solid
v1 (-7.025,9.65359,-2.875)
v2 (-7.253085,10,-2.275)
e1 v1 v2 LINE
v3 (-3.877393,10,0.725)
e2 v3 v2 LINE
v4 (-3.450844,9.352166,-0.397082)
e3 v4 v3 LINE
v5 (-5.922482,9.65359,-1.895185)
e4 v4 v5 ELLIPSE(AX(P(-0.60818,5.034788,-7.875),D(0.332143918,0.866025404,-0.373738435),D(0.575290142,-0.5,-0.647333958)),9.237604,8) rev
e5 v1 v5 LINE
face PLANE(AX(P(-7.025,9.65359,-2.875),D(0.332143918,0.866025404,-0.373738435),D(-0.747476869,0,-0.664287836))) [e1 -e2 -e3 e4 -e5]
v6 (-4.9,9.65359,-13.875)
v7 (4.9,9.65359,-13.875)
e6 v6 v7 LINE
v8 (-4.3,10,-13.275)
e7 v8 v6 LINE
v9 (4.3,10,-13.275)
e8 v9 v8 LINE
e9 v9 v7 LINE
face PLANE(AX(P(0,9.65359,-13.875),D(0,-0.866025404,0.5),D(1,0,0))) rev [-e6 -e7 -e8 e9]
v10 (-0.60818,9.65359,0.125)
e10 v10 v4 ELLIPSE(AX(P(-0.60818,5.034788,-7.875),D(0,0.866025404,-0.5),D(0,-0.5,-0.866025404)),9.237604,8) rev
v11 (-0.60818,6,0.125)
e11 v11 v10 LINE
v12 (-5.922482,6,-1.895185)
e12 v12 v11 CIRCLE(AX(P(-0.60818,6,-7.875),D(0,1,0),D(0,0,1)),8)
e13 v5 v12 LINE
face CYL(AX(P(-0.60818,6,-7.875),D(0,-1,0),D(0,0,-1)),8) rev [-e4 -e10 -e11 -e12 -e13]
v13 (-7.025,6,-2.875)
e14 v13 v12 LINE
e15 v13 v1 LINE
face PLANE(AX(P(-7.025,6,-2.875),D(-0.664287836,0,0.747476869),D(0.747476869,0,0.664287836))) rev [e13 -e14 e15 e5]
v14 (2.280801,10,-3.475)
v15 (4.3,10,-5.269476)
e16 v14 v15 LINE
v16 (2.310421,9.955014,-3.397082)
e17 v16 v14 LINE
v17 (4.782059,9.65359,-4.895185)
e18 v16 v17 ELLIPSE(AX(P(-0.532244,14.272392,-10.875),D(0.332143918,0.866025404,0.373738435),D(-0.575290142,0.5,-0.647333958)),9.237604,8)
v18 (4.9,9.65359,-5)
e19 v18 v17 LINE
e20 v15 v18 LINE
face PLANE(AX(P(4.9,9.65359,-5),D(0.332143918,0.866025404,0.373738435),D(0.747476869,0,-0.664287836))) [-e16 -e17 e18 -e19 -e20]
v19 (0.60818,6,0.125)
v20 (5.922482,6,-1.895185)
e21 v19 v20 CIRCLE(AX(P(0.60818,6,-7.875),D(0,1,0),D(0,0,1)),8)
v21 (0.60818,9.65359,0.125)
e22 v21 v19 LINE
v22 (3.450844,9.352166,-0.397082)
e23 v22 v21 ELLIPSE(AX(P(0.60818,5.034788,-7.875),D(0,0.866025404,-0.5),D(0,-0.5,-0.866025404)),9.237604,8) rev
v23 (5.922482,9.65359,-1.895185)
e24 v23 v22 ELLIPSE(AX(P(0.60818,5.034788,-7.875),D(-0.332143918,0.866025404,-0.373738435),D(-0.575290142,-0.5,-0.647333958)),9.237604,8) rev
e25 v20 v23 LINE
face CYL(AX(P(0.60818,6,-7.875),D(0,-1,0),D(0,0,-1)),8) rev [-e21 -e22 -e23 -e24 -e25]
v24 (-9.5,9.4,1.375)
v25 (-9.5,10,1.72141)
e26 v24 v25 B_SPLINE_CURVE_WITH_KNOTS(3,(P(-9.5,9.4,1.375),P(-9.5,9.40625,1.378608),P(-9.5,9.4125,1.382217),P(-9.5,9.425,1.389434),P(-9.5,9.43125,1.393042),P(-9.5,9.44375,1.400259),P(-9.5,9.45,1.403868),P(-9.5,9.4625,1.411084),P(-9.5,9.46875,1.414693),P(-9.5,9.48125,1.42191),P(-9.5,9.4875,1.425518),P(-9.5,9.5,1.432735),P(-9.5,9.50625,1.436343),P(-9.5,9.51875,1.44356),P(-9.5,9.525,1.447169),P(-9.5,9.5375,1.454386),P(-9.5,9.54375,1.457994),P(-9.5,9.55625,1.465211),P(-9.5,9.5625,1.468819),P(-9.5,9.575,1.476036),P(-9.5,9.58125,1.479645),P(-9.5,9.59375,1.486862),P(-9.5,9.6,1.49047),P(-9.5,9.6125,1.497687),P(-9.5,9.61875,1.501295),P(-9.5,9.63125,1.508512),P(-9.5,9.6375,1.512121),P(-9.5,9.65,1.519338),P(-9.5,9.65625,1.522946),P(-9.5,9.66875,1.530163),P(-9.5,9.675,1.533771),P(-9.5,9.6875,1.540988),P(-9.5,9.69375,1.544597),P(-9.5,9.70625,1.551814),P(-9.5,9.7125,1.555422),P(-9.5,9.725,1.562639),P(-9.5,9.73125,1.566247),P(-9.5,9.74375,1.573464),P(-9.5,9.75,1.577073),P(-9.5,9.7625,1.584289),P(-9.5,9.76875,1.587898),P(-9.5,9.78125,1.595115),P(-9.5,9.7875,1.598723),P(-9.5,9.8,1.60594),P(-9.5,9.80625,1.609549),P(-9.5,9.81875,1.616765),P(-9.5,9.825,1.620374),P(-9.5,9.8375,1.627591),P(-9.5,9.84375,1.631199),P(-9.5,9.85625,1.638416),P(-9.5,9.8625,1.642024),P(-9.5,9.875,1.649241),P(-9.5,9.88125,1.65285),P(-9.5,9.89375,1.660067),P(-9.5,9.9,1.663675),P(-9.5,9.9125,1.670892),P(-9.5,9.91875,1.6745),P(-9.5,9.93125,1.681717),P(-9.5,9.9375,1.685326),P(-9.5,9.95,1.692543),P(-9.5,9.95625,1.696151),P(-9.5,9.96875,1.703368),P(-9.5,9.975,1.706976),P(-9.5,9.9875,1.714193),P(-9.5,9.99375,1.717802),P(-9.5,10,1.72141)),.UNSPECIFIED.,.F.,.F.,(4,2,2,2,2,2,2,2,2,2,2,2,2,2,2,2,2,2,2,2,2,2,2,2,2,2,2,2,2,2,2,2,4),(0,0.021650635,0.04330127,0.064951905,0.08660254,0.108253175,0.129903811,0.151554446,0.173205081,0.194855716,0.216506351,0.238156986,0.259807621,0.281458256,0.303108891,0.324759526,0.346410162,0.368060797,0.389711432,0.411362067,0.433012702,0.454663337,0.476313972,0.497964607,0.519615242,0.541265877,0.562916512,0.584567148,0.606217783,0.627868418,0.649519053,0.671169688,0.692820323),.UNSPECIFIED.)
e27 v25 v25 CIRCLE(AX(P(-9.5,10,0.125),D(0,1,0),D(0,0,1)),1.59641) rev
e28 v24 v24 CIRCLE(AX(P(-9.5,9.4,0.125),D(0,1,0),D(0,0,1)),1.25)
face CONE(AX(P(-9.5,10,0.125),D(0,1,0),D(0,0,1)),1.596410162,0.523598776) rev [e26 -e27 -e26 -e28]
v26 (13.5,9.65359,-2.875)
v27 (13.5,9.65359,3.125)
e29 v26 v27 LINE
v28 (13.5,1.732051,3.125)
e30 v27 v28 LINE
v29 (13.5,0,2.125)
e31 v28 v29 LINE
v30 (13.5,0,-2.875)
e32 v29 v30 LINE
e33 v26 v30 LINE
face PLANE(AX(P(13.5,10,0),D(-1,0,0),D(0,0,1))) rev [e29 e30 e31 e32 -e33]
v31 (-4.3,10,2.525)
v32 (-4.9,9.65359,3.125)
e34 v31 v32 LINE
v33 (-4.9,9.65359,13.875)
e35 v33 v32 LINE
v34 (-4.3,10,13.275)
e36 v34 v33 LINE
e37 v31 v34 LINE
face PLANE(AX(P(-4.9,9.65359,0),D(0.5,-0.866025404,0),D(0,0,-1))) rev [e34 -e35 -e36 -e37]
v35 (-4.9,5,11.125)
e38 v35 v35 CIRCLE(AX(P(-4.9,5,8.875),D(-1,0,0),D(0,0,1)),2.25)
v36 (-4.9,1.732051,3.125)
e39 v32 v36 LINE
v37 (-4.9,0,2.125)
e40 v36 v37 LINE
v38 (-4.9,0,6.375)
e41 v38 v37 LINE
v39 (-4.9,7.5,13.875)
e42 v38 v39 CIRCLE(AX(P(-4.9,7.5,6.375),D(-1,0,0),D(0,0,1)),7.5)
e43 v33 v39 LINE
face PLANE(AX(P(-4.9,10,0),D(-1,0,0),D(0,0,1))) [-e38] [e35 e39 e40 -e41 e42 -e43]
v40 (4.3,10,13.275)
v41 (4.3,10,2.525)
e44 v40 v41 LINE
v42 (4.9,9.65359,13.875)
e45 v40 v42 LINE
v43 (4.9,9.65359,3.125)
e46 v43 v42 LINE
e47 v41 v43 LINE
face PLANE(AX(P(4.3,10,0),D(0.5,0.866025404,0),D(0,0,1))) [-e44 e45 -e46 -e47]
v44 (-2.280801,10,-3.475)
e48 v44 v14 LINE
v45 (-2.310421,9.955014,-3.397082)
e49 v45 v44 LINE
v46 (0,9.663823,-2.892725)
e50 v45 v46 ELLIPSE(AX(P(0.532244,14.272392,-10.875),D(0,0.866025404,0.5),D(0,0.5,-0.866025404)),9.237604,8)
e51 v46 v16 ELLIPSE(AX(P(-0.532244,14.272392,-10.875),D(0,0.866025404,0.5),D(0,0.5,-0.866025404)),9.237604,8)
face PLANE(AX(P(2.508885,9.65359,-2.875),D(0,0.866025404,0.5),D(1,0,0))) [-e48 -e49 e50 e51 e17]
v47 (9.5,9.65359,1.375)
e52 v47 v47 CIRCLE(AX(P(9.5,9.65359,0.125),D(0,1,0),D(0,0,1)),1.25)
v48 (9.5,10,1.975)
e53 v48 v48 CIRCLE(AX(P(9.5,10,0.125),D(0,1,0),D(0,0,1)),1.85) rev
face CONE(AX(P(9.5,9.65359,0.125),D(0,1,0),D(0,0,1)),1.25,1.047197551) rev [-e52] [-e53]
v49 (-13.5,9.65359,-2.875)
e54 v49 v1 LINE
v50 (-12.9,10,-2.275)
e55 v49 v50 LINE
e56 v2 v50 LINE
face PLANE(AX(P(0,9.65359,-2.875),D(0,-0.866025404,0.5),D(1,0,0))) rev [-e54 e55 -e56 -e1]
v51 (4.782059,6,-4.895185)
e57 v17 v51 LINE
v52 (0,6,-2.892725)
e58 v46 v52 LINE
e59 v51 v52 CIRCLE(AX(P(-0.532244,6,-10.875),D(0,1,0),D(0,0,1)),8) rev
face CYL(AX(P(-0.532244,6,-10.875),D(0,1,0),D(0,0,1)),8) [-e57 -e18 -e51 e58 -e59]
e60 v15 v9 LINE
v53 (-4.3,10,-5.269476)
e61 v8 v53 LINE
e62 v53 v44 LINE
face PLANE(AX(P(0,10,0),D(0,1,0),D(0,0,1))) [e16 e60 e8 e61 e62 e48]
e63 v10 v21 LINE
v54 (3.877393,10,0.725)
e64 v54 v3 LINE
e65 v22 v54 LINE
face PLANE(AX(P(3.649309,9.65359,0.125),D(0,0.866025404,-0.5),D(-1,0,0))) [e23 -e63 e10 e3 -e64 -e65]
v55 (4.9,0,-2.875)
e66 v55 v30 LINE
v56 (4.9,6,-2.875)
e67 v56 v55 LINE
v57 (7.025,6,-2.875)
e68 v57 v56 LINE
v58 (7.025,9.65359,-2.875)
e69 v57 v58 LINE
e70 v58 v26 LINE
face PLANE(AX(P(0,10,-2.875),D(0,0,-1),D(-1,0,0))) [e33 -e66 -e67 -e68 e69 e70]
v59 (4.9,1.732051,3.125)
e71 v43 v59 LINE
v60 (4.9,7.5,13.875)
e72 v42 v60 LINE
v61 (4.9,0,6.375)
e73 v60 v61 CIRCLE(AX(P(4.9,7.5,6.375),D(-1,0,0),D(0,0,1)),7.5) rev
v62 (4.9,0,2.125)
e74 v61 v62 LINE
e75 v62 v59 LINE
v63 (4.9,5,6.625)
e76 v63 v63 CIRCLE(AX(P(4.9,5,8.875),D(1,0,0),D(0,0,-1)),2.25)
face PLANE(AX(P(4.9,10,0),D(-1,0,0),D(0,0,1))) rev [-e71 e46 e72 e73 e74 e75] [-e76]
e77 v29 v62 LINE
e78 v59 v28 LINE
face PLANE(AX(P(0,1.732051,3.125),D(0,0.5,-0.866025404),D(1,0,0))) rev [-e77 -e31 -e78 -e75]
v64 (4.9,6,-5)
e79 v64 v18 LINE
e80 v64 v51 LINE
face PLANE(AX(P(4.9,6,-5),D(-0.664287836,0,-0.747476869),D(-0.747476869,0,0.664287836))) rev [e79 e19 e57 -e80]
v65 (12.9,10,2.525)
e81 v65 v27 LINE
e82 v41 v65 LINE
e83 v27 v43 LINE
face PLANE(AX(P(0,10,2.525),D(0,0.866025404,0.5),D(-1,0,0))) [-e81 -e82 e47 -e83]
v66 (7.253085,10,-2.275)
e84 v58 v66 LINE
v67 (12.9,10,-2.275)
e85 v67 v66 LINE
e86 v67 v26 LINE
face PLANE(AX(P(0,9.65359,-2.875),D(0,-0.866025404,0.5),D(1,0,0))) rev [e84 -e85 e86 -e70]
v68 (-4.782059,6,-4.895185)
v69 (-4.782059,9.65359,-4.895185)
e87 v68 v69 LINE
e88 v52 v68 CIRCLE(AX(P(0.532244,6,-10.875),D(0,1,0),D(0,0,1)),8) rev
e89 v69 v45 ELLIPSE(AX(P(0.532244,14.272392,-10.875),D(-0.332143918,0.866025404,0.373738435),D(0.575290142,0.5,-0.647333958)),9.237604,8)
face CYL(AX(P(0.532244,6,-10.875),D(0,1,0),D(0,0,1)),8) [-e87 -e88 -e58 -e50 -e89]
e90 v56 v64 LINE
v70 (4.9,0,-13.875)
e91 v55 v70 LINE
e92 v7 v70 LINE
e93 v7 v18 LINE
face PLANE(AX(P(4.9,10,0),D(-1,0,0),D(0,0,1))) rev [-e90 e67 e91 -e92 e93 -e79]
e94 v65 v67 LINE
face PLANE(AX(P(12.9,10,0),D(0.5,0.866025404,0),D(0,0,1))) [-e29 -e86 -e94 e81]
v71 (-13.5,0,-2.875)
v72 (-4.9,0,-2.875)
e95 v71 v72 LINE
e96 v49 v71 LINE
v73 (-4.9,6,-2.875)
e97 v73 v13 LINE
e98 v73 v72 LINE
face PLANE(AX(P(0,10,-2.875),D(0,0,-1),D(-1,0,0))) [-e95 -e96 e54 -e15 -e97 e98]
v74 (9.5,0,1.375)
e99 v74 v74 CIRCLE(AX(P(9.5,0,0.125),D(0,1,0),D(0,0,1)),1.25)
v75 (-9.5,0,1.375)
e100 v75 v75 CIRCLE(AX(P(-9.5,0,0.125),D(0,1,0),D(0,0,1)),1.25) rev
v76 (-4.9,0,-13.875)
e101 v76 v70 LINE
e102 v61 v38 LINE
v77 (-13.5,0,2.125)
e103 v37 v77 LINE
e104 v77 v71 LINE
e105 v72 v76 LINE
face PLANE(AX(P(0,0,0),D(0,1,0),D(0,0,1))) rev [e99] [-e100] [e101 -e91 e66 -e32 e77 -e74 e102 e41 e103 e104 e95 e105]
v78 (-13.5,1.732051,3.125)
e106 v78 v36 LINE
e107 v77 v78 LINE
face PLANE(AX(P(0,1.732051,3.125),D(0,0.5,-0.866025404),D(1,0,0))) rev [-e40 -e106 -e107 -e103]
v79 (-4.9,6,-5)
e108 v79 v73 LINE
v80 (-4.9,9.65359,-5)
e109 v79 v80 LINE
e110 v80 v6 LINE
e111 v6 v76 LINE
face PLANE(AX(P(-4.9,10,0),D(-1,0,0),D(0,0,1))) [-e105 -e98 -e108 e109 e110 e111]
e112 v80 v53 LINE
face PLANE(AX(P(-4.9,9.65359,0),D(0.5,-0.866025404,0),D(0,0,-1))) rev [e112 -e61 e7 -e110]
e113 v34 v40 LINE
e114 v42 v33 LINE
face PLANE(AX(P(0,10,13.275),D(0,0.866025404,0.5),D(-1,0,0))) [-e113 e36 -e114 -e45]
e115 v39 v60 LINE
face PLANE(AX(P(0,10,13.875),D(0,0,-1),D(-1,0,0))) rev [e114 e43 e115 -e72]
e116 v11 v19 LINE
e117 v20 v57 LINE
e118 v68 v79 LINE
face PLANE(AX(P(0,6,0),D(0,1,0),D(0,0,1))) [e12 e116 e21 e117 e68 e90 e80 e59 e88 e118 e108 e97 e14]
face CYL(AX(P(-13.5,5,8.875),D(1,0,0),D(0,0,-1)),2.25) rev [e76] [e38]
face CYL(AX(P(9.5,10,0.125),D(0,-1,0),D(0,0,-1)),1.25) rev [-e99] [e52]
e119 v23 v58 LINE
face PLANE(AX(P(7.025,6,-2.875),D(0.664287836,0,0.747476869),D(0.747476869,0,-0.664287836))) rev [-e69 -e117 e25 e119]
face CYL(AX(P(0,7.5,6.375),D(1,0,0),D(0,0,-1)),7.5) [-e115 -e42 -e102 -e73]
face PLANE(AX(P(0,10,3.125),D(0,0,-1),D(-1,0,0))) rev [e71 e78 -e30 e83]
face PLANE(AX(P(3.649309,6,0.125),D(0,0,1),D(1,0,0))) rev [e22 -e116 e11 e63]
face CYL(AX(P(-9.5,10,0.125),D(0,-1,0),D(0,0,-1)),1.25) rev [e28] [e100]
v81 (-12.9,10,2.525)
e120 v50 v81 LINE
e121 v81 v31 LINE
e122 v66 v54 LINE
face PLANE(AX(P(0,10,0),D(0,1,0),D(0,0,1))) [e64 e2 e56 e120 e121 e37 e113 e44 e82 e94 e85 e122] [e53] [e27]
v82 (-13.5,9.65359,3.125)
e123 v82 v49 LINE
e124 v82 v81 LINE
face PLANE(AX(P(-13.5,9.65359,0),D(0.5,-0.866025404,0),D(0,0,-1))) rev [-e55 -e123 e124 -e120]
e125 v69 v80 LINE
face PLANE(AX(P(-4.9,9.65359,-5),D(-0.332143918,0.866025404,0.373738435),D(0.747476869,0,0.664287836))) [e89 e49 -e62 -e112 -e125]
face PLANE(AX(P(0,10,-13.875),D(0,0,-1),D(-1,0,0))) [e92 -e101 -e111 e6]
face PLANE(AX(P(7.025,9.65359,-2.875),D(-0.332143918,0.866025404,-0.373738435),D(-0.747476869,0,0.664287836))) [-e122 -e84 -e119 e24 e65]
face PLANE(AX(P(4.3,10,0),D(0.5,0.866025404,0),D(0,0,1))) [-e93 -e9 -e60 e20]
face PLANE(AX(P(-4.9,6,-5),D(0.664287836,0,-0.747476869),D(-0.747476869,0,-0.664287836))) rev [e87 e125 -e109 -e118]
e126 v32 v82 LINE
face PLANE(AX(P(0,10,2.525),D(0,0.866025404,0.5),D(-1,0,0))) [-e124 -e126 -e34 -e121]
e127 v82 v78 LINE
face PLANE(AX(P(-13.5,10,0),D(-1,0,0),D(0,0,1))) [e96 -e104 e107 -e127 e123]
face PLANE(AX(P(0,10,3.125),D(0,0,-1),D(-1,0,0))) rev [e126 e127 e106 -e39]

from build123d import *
from OCP.BRepFilletAPI import BRepFilletAPI_MakeChamfer

# Parameters (mm, degrees)
SKETCH_1_W          = 9.8
SKETCH_1_H          = 11
SKETCH_1_W_2        = 8.6
SKETCH_1_H_2        = 6
SKETCH_1_R          = 1.25
SKETCH_1_H_3        = 10.75
EXTRUDE_1_DEPTH     = 10
SKETCH_3_R          = 2.25
CUT_EXTRUDE_2_DEPTH = 26.121218621
CUT_EXTRUDE_3_DEPTH = 4
FILLET_2_R          = 7.5
CHAMFER_1_SIZE      = 0.6
CHAMFER_1_SIZE2     = 0.346410162
FILLET_3_R          = 8
CHAMFER_3_SIZE      = 1
CHAMFER_3_SIZE2     = 1.732050808


with BuildPart() as part:
    # ｽｹｯﾁ1 → ﾎﾞｽ - 押し出し1 (new body)
    # profile 1 of 5: a face of its own
    with BuildSketch(Plane(origin=(0, 0, 0), x_dir=(1, 0, 0), z_dir=(0, 1, 0))):
        with Locations((0, 8.375)):
            Rectangle(SKETCH_1_W, SKETCH_1_H)
    # profile 2 of 5: a face of its own
    with BuildSketch(Plane(origin=(0, 0, 0), x_dir=(1, 0, 0), z_dir=(0, 1, 0))):
        with Locations((9.2, -0.125)):
            Rectangle(SKETCH_1_W_2, SKETCH_1_H_2)
        with Locations(Location((9.5, -0.125, 0), (0, 0, 270))):
            Circle(SKETCH_1_R, mode=Mode.SUBTRACT)
    # profile 3 of 5: a face of its own
    with BuildSketch(Plane(origin=(0, 0, 0), x_dir=(1, 0, 0), z_dir=(0, 1, 0))):
        with Locations((0, -0.125)):
            Rectangle(SKETCH_1_W, SKETCH_1_H_2)
    # profile 4 of 5: a face of its own
    with BuildSketch(Plane(origin=(0, 0, 0), x_dir=(1, 0, 0), z_dir=(0, 1, 0))):
        with Locations((-9.2, -0.125)):
            Rectangle(SKETCH_1_W_2, SKETCH_1_H_2)
        with Locations(Location((-9.5, -0.125, 0), (0, 0, 270))):
            Circle(SKETCH_1_R, mode=Mode.SUBTRACT)
    # profile 5 of 5: a face of its own
    with BuildSketch(Plane(origin=(0, 0, 0), x_dir=(1, 0, 0), z_dir=(0, 1, 0))):
        with Locations((0, -8.5)):
            Rectangle(SKETCH_1_W, SKETCH_1_H_3)
    extrude(amount=EXTRUDE_1_DEPTH)

    # ｽｹｯﾁ3 → ｶｯﾄ - 押し出し2 (cut, through all)
    with BuildSketch(Plane(origin=(4.9, 0, 0), x_dir=(0, 0, -1), z_dir=(1, 0, 0))):
        with Locations((-8.875, 5)):
            Circle(SKETCH_3_R)
    extrude(amount=-CUT_EXTRUDE_2_DEPTH, mode=Mode.SUBTRACT)

    # ｽｹｯﾁ5 → ｶｯﾄ - 押し出し3 (cut)
    with BuildSketch(Plane(origin=(0, 10, 0), x_dir=(1, 0, 0), z_dir=(0, 1, 0))):
        Polygon((4.9, 5), (2.508885395, 2.875), (-2.508885395, 2.875), (-4.9, 5), (-4.9, 2.875), (-7.025, 2.875), (-3.649308793, -0.125), (3.649308793, -0.125), (7.025, 2.875), (4.9, 2.875), align=None)
    extrude(amount=-CUT_EXTRUDE_3_DEPTH, mode=Mode.SUBTRACT)

    # ﾌｨﾚｯﾄ2
    fillet_2_edges = [part.edges().sort_by_distance(p)[0] for p in [
        (0, 0, 13.875),
    ]]
    fillet(fillet_2_edges, radius=FILLET_2_R)

    # 面取り1: one chamfer whose edges measure the first distance from different faces: ONE call of the kernel's chamfer builder (chamfer() names one face for all edges)
    chamfer_1_edges_1 = [part.edges().sort_by_distance(p)[0] for p in [
        (-10.2625, 10, -2.875),
        (-13.5, 10, 0.125),
        (-9.2, 10, 3.125),
        (-4.9, 10, 8.5),
        (0, 10, 13.875),
        (4.9, 10, 8.5),
        (9.2, 10, 3.125),
        (13.5, 10, 0.125),
        (10.2625, 10, -2.875),
        (-5.337154396, 10, -1.375),
        (0, 10, 0.125),
        (5.337154396, 10, -1.375),
        (9.5, 10, -1.125),
    ]]
    chamfer_1_side_1 = [part.faces().sort_by_distance(p)[0] for p in [
        (0, 10, 4.272957296),
    ]]
    chamfer_1_edges_2 = [part.edges().sort_by_distance(p)[0] for p in [
        (-4.9, 10, -9.4375),
        (4.9, 10, -9.4375),
        (0, 10, -13.875),
        (3.704442697, 10, -3.9375),
        (0, 10, -2.875),
        (-3.704442697, 10, -3.9375),
    ]]
    chamfer_1_side_2 = [part.faces().sort_by_distance(p)[0] for p in [
        (0, 10, -8.612025812),
    ]]
    chamfer_1_edges_3 = [part.edges().sort_by_distance(p)[0] for p in [
        (-9.5, 10, -1.125),
    ]]
    chamfer_1_side_3 = [part.faces().sort_by_distance(p)[0] for p in [
        (-9.5, 5, -1.125),
    ]]
    chamfer_1 = BRepFilletAPI_MakeChamfer(part.part.solid().wrapped)
    for e in chamfer_1_edges_1:
        chamfer_1.Add(CHAMFER_1_SIZE, CHAMFER_1_SIZE2, e.wrapped, chamfer_1_side_1[0].wrapped)  # the first distance lies on this face
    for e in chamfer_1_edges_2:
        chamfer_1.Add(CHAMFER_1_SIZE, CHAMFER_1_SIZE2, e.wrapped, chamfer_1_side_2[0].wrapped)  # the first distance lies on this face
    for e in chamfer_1_edges_3:
        chamfer_1.Add(CHAMFER_1_SIZE, CHAMFER_1_SIZE2, e.wrapped, chamfer_1_side_3[0].wrapped)  # the first distance lies on this face
    add(Compound.cast(chamfer_1.Shape()), mode=Mode.REPLACE)

    # ﾌｨﾚｯﾄ3
    # the kernel refuses this fillet: 8 mm, written as the material it adds along each edge
    with BuildSketch(Plane(origin=(-3.649308793, 17.256412491, 0.125), x_dir=(-0.7474768694815634, 0, -0.6642878364007891), z_dir=(0, -1, 0))) as fillet_3_piece_1_section:
        with BuildLine():
            CenterArc((FILLET_3_R * 0.380141132625, FILLET_3_R), FILLET_3_R, 228.372286683, 41.627713317)
            Line((-FILLET_3_R * 0.284146703776, FILLET_3_R * 0.252523130518), (0, 0))
            Line((0, 0), (FILLET_3_R * 0.380141132625, 0))
        make_face()
    fillet_3_piece_1 = extrude(amount=11.256412491, mode=Mode.PRIVATE)
    fillet_3_piece_1 = split(fillet_3_piece_1, bisect_by=Plane(origin=(-2.381035156, 9.533713371, -0.082632133), z_dir=(0, -0.8660254037844377, 0.5000000000000018)), keep=Keep.TOP, mode=Mode.PRIVATE)
    add(fillet_3_piece_1)
    with BuildSketch(Plane(origin=(-3.649308793, 17.256412491, 0.125), x_dir=(-0.7474768694815634, 0, -0.6642878364007891), z_dir=(0, -1, 0))) as fillet_3_piece_2_section:
        with BuildLine():
            CenterArc((FILLET_3_R * 0.380141132625, FILLET_3_R), FILLET_3_R, 228.372286683, 41.627713317)
            Line((-FILLET_3_R * 0.284146703776, FILLET_3_R * 0.252523130518), (0, 0))
            Line((0, 0), (FILLET_3_R * 0.380141132625, 0))
        make_face()
    fillet_3_piece_2 = extrude(amount=11.256412491, mode=Mode.PRIVATE)
    fillet_3_piece_2 = split(fillet_3_piece_2, bisect_by=Plane(origin=(-4.4593865, 9.533713371, -0.872698967), z_dir=(-0.3321439182003959, -0.8660254037844376, 0.37373843474078333)), keep=Keep.TOP, mode=Mode.PRIVATE)
    add(fillet_3_piece_2)
    with BuildSketch(Plane(origin=(3.649308793, 17.256412491, 0.125), x_dir=(0.7474768694815636, 0, -0.6642878364007891), z_dir=(0, -1, 0))) as fillet_3_piece_3_section:
        with BuildLine():
            CenterArc((FILLET_3_R * 0.380141132625, -FILLET_3_R), FILLET_3_R, 90, 41.627713317)
            Line((-FILLET_3_R * 0.284146703776, -FILLET_3_R * 0.252523130518), (0, 0))
            Line((0, 0), (FILLET_3_R * 0.380141132625, 0))
        make_face()
    fillet_3_piece_3 = extrude(amount=11.256412491, mode=Mode.PRIVATE)
    fillet_3_piece_3 = split(fillet_3_piece_3, bisect_by=Plane(origin=(2.381035156, 9.533713371, -0.082632133), z_dir=(0, -0.8660254037844377, 0.5000000000000018)), keep=Keep.TOP, mode=Mode.PRIVATE)
    add(fillet_3_piece_3)
    with BuildSketch(Plane(origin=(3.649308793, 17.256412491, 0.125), x_dir=(0.7474768694815636, 0, -0.6642878364007891), z_dir=(0, -1, 0))) as fillet_3_piece_4_section:
        with BuildLine():
            CenterArc((FILLET_3_R * 0.380141132625, -FILLET_3_R), FILLET_3_R, 90, 41.627713317)
            Line((-FILLET_3_R * 0.284146703776, -FILLET_3_R * 0.252523130518), (0, 0))
            Line((0, 0), (FILLET_3_R * 0.380141132625, 0))
        make_face()
    fillet_3_piece_4 = extrude(amount=11.256412491, mode=Mode.PRIVATE)
    fillet_3_piece_4 = split(fillet_3_piece_4, bisect_by=Plane(origin=(4.4593865, 9.533713371, -0.872698967), z_dir=(0.3321439182003956, -0.8660254037844377, 0.373738434740783)), keep=Keep.TOP, mode=Mode.PRIVATE)
    add(fillet_3_piece_4)
    # the kernel refuses this fillet: 8 mm, written as the material it takes off along each edge
    with BuildSketch(Plane(origin=(2.508885395, 17.256412491, -2.875), x_dir=(0.7474768694815637, 0, -0.664287836400789), z_dir=(0, -1, 0)), Plane(origin=(-2.508885395, 17.256412491, -2.875), x_dir=(1, 0, 0), z_dir=(0, -1, 0))) as fillet_3_2_piece_1:
        with BuildLine():
            CenterArc((FILLET_3_R * 0.380141132625, -FILLET_3_R), FILLET_3_R, 90, 41.627713317)
            Line((-FILLET_3_R * 0.284146703776, -FILLET_3_R * 0.252523130518), (0, 0))
            Line((0, 0), (FILLET_3_R * 0.380141132625, 0))
        make_face()
    extrude(amount=11.256412491, mode=Mode.SUBTRACT)

    # 面取り3
    chamfer_3_edges = [part.edges().sort_by_distance(p)[0] for p in [
        (9.2, 0, 3.125),
        (-9.2, 0, 3.125),
    ]]
    chamfer_3_side = [part.faces().sort_by_distance(p)[0] for p in [
        (0, 0, -2.510051578),
    ]]
    chamfer(chamfer_3_edges, length=CHAMFER_3_SIZE, length2=CHAMFER_3_SIZE2, reference=chamfer_3_side[0])


solid = part.part
